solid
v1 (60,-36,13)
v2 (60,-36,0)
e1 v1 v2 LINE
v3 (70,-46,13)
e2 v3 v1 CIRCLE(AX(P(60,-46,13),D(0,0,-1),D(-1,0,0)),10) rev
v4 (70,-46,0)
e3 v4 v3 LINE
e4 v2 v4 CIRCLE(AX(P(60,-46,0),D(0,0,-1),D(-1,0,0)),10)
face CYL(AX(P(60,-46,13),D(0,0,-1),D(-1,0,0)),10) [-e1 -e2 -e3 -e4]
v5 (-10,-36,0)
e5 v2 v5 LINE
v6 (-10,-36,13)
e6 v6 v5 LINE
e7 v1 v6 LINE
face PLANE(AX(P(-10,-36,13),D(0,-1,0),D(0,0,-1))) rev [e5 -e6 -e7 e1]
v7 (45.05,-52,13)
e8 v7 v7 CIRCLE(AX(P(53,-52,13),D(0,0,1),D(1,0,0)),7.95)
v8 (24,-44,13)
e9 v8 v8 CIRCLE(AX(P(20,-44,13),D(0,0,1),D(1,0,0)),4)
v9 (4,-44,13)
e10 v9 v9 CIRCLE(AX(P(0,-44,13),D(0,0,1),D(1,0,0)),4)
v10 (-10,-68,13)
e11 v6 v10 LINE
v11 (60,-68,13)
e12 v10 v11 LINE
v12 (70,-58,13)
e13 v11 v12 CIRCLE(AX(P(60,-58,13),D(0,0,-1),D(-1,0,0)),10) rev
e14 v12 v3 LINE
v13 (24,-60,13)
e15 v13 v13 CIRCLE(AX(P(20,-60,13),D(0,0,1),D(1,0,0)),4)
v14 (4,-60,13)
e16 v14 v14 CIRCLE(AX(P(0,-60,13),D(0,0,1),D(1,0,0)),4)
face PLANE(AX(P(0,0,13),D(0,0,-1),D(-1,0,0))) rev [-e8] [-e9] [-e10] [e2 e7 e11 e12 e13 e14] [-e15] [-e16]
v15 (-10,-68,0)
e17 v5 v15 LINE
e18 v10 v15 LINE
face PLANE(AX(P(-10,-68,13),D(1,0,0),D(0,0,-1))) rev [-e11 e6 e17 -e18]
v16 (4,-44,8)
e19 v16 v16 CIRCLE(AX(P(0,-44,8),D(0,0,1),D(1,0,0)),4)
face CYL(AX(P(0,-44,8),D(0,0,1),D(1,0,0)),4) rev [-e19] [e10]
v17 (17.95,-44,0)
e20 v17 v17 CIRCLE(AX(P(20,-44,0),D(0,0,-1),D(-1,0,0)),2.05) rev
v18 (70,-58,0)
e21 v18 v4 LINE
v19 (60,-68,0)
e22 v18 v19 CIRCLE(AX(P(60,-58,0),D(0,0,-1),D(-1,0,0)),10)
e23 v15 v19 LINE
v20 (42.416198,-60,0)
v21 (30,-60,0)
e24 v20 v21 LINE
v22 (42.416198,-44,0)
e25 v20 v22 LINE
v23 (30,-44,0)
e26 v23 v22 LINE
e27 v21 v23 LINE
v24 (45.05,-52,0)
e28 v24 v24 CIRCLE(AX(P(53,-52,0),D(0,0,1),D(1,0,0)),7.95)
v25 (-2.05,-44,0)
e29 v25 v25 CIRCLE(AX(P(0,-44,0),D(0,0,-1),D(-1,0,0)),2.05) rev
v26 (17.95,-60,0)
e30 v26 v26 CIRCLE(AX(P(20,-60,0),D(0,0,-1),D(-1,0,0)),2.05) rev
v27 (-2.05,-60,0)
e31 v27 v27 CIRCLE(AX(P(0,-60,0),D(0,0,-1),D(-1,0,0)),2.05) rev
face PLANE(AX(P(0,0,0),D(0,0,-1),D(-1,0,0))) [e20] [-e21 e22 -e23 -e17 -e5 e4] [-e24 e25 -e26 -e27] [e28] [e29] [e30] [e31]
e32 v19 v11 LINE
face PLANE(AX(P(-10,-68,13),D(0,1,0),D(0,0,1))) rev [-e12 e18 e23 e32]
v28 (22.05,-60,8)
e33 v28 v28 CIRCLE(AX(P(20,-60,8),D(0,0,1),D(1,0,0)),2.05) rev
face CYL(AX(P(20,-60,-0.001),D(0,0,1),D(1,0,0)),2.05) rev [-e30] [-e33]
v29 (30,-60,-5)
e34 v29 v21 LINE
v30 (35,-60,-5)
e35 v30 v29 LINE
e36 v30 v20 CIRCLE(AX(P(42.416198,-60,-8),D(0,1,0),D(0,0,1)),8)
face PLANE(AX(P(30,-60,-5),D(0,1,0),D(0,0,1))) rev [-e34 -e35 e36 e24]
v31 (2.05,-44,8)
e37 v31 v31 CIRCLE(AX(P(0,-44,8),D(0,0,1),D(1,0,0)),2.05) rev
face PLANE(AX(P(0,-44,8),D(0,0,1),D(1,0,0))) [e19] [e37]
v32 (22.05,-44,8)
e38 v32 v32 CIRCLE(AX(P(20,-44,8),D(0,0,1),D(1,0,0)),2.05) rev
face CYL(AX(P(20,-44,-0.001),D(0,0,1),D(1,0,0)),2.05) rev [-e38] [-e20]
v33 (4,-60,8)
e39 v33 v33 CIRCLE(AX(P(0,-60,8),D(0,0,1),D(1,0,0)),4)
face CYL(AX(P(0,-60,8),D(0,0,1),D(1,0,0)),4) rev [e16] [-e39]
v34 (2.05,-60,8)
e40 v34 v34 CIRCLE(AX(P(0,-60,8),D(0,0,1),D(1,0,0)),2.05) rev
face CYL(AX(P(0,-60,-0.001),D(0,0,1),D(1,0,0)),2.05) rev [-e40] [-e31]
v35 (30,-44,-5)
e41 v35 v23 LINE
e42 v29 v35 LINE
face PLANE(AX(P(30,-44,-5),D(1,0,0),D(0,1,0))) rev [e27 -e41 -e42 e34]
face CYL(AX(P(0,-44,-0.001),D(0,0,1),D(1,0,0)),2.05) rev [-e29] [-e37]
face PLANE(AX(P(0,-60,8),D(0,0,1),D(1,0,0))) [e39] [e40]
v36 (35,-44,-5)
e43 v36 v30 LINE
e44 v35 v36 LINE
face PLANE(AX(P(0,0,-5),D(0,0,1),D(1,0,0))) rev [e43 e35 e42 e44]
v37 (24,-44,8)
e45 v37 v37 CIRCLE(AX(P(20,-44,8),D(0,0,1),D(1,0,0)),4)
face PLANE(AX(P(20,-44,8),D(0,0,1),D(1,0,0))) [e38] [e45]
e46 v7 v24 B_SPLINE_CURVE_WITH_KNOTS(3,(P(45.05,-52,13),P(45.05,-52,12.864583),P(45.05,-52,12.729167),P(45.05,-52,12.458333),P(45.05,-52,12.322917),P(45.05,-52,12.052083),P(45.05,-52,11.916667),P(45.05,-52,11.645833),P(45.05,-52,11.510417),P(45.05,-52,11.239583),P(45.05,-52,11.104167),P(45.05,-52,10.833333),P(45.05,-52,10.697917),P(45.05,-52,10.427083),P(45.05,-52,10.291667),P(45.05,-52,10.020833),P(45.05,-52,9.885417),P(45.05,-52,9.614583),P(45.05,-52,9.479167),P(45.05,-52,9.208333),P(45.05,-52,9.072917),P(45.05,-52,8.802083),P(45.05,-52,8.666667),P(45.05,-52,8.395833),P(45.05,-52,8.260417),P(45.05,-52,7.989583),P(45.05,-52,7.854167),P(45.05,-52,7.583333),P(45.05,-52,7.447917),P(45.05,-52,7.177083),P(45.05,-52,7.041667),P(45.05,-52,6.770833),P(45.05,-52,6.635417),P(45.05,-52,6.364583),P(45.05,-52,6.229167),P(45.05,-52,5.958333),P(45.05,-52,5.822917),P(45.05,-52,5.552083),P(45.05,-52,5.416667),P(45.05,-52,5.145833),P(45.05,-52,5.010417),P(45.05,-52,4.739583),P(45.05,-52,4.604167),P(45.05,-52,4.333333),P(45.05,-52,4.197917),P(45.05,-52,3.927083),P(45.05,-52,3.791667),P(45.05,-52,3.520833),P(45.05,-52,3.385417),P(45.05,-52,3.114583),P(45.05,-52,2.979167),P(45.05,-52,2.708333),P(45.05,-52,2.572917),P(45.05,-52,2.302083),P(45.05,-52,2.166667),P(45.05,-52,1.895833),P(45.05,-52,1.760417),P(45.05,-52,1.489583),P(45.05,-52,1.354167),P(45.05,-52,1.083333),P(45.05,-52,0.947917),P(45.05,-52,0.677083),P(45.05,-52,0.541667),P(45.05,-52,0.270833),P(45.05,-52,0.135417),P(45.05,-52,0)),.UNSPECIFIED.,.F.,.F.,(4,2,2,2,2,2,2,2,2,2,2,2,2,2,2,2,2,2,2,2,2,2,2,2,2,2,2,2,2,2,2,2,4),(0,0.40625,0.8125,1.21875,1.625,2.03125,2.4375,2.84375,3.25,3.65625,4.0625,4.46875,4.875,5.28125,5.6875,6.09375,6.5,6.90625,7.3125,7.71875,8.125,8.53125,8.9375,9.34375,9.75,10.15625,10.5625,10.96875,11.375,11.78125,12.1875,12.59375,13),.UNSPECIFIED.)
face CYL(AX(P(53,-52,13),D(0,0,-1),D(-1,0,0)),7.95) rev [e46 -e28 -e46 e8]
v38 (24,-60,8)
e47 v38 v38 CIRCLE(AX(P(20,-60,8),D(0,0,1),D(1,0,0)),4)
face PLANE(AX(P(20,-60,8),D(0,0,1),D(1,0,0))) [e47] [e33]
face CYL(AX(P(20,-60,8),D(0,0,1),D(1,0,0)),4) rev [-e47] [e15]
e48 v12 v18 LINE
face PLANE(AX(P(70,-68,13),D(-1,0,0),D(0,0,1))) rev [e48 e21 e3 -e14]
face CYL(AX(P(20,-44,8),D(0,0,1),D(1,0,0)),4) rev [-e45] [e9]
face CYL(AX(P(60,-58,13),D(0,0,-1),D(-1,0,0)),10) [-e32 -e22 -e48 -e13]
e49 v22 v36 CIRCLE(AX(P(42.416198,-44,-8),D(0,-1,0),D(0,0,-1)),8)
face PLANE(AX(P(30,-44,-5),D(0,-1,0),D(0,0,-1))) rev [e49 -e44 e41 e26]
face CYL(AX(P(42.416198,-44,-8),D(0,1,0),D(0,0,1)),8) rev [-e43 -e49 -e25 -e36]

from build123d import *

# Parameters (mm, degrees)
CROQUIS1_W              = 80
CROQUIS1_H              = 32
CROQUIS1_R              = 7.95
SALIENTE_EXTRUIR1_DEPTH = 13
CORTAR_EXTRUIR1_REACH   = 100.453
CROQUIS2_R              = 2.05
CROQUIS3_R              = 4
CORTAR_EXTRUIR2_DEPTH   = 5
REDONDEO1_R             = 10
CROQUIS4_W              = 5
CROQUIS4_H              = 16
SALIENTE_EXTRUIR2_DEPTH = 5
REDONDEO2_R             = 8


with BuildPart() as part:
    # Croquis1 → Saliente-Extruir1 (new body)
    with BuildSketch(Plane.XY):
        with Locations((30, -52)):
            Rectangle(CROQUIS1_W, CROQUIS1_H)
        with Locations(Location((53, -52, 0), (0, 0, 180))):
            Circle(CROQUIS1_R, mode=Mode.SUBTRACT)
    extrude(amount=SALIENTE_EXTRUIR1_DEPTH)

    # Croquis2 → Cortar-Extruir1 (cut, up to next)
    with BuildSketch(Plane.XY.offset(13), mode=Mode.PRIVATE) as cortar_extruir1_sk1:
        with Locations((0, -44)):
            Circle(CROQUIS2_R)
    cortar_extruir1_tool1 = extrude(cortar_extruir1_sk1.sketch, amount=-CORTAR_EXTRUIR1_REACH, mode=Mode.PRIVATE) & part.part
    # Croquis2 → Cortar-Extruir1 (cut, up to next)
    with BuildSketch(Plane.XY.offset(13), mode=Mode.PRIVATE) as cortar_extruir1_sk2:
        with Locations((20, -44)):
            Circle(CROQUIS2_R)
    cortar_extruir1_tool2 = extrude(cortar_extruir1_sk2.sketch, amount=-CORTAR_EXTRUIR1_REACH, mode=Mode.PRIVATE) & part.part
    # Croquis2 → Cortar-Extruir1 (cut, up to next)
    with BuildSketch(Plane.XY.offset(13), mode=Mode.PRIVATE) as cortar_extruir1_sk3:
        with Locations((0, -60)):
            Circle(CROQUIS2_R)
    cortar_extruir1_tool3 = extrude(cortar_extruir1_sk3.sketch, amount=-CORTAR_EXTRUIR1_REACH, mode=Mode.PRIVATE) & part.part
    # Croquis2 → Cortar-Extruir1 (cut, up to next)
    with BuildSketch(Plane.XY.offset(13), mode=Mode.PRIVATE) as cortar_extruir1_sk4:
        with Locations((20, -60)):
            Circle(CROQUIS2_R)
    cortar_extruir1_tool4 = extrude(cortar_extruir1_sk4.sketch, amount=-CORTAR_EXTRUIR1_REACH, mode=Mode.PRIVATE) & part.part
    add(cortar_extruir1_tool1.solids().sort_by_distance((0, -44, 13))[0], mode=Mode.SUBTRACT)
    add(cortar_extruir1_tool2.solids().sort_by_distance((20, -44, 13))[0], mode=Mode.SUBTRACT)
    add(cortar_extruir1_tool3.solids().sort_by_distance((0, -60, 13))[0], mode=Mode.SUBTRACT)
    add(cortar_extruir1_tool4.solids().sort_by_distance((20, -60, 13))[0], mode=Mode.SUBTRACT)

    # Croquis3 → Cortar-Extruir2 (cut)
    with BuildSketch(Plane.XY.offset(13)):
        with Locations((0, -44)):
            Circle(CROQUIS3_R)
        with Locations((20, -44)):
            Circle(CROQUIS3_R)
        with Locations((20, -60)):
            Circle(CROQUIS3_R)
        with Locations((0, -60)):
            Circle(CROQUIS3_R)
    extrude(amount=-CORTAR_EXTRUIR2_DEPTH, mode=Mode.SUBTRACT)

    # Redondeo1
    redondeo1_edges = [part.edges().sort_by_distance(p)[0] for p in [
        (70, -36, 6.5),
        (70, -68, 6.5),
    ]]
    fillet(redondeo1_edges, radius=REDONDEO1_R)

    # Croquis4 → Saliente-Extruir2 (add)
    with BuildSketch(Plane(origin=(0, 0, 0), x_dir=(-1, 0, 0), z_dir=(0, 0, -1))):
        with Locations((-32.5, -52)):
            Rectangle(CROQUIS4_W, CROQUIS4_H)
    extrude(amount=SALIENTE_EXTRUIR2_DEPTH)

    # Redondeo2
    # the kernel refuses this fillet: 8 mm, written as the material it adds along each edge
    with BuildSketch(Plane(origin=(35, -44, 0), x_dir=(1, 0, 0), z_dir=(0, -1, 0))) as redondeo2_piece_1:
        with BuildLine():
            CenterArc((7.416198487, -8), REDONDEO2_R, 90, 67.975687163)
            Line((0, -5), (-0.14832397, -4.94))
            ThreePointArc((-0.14832397, -4.94), (-0.16, -2.5), (-0.16, 0))
            Line((-0.16, 0), (0, 0.16))
            Line((0, 0.16), (7.416198487, 0.16))
            Line((7.416198487, 0.16), (7.416198487, 0))
        make_face()
    extrude(amount=16)


solid = part.part
